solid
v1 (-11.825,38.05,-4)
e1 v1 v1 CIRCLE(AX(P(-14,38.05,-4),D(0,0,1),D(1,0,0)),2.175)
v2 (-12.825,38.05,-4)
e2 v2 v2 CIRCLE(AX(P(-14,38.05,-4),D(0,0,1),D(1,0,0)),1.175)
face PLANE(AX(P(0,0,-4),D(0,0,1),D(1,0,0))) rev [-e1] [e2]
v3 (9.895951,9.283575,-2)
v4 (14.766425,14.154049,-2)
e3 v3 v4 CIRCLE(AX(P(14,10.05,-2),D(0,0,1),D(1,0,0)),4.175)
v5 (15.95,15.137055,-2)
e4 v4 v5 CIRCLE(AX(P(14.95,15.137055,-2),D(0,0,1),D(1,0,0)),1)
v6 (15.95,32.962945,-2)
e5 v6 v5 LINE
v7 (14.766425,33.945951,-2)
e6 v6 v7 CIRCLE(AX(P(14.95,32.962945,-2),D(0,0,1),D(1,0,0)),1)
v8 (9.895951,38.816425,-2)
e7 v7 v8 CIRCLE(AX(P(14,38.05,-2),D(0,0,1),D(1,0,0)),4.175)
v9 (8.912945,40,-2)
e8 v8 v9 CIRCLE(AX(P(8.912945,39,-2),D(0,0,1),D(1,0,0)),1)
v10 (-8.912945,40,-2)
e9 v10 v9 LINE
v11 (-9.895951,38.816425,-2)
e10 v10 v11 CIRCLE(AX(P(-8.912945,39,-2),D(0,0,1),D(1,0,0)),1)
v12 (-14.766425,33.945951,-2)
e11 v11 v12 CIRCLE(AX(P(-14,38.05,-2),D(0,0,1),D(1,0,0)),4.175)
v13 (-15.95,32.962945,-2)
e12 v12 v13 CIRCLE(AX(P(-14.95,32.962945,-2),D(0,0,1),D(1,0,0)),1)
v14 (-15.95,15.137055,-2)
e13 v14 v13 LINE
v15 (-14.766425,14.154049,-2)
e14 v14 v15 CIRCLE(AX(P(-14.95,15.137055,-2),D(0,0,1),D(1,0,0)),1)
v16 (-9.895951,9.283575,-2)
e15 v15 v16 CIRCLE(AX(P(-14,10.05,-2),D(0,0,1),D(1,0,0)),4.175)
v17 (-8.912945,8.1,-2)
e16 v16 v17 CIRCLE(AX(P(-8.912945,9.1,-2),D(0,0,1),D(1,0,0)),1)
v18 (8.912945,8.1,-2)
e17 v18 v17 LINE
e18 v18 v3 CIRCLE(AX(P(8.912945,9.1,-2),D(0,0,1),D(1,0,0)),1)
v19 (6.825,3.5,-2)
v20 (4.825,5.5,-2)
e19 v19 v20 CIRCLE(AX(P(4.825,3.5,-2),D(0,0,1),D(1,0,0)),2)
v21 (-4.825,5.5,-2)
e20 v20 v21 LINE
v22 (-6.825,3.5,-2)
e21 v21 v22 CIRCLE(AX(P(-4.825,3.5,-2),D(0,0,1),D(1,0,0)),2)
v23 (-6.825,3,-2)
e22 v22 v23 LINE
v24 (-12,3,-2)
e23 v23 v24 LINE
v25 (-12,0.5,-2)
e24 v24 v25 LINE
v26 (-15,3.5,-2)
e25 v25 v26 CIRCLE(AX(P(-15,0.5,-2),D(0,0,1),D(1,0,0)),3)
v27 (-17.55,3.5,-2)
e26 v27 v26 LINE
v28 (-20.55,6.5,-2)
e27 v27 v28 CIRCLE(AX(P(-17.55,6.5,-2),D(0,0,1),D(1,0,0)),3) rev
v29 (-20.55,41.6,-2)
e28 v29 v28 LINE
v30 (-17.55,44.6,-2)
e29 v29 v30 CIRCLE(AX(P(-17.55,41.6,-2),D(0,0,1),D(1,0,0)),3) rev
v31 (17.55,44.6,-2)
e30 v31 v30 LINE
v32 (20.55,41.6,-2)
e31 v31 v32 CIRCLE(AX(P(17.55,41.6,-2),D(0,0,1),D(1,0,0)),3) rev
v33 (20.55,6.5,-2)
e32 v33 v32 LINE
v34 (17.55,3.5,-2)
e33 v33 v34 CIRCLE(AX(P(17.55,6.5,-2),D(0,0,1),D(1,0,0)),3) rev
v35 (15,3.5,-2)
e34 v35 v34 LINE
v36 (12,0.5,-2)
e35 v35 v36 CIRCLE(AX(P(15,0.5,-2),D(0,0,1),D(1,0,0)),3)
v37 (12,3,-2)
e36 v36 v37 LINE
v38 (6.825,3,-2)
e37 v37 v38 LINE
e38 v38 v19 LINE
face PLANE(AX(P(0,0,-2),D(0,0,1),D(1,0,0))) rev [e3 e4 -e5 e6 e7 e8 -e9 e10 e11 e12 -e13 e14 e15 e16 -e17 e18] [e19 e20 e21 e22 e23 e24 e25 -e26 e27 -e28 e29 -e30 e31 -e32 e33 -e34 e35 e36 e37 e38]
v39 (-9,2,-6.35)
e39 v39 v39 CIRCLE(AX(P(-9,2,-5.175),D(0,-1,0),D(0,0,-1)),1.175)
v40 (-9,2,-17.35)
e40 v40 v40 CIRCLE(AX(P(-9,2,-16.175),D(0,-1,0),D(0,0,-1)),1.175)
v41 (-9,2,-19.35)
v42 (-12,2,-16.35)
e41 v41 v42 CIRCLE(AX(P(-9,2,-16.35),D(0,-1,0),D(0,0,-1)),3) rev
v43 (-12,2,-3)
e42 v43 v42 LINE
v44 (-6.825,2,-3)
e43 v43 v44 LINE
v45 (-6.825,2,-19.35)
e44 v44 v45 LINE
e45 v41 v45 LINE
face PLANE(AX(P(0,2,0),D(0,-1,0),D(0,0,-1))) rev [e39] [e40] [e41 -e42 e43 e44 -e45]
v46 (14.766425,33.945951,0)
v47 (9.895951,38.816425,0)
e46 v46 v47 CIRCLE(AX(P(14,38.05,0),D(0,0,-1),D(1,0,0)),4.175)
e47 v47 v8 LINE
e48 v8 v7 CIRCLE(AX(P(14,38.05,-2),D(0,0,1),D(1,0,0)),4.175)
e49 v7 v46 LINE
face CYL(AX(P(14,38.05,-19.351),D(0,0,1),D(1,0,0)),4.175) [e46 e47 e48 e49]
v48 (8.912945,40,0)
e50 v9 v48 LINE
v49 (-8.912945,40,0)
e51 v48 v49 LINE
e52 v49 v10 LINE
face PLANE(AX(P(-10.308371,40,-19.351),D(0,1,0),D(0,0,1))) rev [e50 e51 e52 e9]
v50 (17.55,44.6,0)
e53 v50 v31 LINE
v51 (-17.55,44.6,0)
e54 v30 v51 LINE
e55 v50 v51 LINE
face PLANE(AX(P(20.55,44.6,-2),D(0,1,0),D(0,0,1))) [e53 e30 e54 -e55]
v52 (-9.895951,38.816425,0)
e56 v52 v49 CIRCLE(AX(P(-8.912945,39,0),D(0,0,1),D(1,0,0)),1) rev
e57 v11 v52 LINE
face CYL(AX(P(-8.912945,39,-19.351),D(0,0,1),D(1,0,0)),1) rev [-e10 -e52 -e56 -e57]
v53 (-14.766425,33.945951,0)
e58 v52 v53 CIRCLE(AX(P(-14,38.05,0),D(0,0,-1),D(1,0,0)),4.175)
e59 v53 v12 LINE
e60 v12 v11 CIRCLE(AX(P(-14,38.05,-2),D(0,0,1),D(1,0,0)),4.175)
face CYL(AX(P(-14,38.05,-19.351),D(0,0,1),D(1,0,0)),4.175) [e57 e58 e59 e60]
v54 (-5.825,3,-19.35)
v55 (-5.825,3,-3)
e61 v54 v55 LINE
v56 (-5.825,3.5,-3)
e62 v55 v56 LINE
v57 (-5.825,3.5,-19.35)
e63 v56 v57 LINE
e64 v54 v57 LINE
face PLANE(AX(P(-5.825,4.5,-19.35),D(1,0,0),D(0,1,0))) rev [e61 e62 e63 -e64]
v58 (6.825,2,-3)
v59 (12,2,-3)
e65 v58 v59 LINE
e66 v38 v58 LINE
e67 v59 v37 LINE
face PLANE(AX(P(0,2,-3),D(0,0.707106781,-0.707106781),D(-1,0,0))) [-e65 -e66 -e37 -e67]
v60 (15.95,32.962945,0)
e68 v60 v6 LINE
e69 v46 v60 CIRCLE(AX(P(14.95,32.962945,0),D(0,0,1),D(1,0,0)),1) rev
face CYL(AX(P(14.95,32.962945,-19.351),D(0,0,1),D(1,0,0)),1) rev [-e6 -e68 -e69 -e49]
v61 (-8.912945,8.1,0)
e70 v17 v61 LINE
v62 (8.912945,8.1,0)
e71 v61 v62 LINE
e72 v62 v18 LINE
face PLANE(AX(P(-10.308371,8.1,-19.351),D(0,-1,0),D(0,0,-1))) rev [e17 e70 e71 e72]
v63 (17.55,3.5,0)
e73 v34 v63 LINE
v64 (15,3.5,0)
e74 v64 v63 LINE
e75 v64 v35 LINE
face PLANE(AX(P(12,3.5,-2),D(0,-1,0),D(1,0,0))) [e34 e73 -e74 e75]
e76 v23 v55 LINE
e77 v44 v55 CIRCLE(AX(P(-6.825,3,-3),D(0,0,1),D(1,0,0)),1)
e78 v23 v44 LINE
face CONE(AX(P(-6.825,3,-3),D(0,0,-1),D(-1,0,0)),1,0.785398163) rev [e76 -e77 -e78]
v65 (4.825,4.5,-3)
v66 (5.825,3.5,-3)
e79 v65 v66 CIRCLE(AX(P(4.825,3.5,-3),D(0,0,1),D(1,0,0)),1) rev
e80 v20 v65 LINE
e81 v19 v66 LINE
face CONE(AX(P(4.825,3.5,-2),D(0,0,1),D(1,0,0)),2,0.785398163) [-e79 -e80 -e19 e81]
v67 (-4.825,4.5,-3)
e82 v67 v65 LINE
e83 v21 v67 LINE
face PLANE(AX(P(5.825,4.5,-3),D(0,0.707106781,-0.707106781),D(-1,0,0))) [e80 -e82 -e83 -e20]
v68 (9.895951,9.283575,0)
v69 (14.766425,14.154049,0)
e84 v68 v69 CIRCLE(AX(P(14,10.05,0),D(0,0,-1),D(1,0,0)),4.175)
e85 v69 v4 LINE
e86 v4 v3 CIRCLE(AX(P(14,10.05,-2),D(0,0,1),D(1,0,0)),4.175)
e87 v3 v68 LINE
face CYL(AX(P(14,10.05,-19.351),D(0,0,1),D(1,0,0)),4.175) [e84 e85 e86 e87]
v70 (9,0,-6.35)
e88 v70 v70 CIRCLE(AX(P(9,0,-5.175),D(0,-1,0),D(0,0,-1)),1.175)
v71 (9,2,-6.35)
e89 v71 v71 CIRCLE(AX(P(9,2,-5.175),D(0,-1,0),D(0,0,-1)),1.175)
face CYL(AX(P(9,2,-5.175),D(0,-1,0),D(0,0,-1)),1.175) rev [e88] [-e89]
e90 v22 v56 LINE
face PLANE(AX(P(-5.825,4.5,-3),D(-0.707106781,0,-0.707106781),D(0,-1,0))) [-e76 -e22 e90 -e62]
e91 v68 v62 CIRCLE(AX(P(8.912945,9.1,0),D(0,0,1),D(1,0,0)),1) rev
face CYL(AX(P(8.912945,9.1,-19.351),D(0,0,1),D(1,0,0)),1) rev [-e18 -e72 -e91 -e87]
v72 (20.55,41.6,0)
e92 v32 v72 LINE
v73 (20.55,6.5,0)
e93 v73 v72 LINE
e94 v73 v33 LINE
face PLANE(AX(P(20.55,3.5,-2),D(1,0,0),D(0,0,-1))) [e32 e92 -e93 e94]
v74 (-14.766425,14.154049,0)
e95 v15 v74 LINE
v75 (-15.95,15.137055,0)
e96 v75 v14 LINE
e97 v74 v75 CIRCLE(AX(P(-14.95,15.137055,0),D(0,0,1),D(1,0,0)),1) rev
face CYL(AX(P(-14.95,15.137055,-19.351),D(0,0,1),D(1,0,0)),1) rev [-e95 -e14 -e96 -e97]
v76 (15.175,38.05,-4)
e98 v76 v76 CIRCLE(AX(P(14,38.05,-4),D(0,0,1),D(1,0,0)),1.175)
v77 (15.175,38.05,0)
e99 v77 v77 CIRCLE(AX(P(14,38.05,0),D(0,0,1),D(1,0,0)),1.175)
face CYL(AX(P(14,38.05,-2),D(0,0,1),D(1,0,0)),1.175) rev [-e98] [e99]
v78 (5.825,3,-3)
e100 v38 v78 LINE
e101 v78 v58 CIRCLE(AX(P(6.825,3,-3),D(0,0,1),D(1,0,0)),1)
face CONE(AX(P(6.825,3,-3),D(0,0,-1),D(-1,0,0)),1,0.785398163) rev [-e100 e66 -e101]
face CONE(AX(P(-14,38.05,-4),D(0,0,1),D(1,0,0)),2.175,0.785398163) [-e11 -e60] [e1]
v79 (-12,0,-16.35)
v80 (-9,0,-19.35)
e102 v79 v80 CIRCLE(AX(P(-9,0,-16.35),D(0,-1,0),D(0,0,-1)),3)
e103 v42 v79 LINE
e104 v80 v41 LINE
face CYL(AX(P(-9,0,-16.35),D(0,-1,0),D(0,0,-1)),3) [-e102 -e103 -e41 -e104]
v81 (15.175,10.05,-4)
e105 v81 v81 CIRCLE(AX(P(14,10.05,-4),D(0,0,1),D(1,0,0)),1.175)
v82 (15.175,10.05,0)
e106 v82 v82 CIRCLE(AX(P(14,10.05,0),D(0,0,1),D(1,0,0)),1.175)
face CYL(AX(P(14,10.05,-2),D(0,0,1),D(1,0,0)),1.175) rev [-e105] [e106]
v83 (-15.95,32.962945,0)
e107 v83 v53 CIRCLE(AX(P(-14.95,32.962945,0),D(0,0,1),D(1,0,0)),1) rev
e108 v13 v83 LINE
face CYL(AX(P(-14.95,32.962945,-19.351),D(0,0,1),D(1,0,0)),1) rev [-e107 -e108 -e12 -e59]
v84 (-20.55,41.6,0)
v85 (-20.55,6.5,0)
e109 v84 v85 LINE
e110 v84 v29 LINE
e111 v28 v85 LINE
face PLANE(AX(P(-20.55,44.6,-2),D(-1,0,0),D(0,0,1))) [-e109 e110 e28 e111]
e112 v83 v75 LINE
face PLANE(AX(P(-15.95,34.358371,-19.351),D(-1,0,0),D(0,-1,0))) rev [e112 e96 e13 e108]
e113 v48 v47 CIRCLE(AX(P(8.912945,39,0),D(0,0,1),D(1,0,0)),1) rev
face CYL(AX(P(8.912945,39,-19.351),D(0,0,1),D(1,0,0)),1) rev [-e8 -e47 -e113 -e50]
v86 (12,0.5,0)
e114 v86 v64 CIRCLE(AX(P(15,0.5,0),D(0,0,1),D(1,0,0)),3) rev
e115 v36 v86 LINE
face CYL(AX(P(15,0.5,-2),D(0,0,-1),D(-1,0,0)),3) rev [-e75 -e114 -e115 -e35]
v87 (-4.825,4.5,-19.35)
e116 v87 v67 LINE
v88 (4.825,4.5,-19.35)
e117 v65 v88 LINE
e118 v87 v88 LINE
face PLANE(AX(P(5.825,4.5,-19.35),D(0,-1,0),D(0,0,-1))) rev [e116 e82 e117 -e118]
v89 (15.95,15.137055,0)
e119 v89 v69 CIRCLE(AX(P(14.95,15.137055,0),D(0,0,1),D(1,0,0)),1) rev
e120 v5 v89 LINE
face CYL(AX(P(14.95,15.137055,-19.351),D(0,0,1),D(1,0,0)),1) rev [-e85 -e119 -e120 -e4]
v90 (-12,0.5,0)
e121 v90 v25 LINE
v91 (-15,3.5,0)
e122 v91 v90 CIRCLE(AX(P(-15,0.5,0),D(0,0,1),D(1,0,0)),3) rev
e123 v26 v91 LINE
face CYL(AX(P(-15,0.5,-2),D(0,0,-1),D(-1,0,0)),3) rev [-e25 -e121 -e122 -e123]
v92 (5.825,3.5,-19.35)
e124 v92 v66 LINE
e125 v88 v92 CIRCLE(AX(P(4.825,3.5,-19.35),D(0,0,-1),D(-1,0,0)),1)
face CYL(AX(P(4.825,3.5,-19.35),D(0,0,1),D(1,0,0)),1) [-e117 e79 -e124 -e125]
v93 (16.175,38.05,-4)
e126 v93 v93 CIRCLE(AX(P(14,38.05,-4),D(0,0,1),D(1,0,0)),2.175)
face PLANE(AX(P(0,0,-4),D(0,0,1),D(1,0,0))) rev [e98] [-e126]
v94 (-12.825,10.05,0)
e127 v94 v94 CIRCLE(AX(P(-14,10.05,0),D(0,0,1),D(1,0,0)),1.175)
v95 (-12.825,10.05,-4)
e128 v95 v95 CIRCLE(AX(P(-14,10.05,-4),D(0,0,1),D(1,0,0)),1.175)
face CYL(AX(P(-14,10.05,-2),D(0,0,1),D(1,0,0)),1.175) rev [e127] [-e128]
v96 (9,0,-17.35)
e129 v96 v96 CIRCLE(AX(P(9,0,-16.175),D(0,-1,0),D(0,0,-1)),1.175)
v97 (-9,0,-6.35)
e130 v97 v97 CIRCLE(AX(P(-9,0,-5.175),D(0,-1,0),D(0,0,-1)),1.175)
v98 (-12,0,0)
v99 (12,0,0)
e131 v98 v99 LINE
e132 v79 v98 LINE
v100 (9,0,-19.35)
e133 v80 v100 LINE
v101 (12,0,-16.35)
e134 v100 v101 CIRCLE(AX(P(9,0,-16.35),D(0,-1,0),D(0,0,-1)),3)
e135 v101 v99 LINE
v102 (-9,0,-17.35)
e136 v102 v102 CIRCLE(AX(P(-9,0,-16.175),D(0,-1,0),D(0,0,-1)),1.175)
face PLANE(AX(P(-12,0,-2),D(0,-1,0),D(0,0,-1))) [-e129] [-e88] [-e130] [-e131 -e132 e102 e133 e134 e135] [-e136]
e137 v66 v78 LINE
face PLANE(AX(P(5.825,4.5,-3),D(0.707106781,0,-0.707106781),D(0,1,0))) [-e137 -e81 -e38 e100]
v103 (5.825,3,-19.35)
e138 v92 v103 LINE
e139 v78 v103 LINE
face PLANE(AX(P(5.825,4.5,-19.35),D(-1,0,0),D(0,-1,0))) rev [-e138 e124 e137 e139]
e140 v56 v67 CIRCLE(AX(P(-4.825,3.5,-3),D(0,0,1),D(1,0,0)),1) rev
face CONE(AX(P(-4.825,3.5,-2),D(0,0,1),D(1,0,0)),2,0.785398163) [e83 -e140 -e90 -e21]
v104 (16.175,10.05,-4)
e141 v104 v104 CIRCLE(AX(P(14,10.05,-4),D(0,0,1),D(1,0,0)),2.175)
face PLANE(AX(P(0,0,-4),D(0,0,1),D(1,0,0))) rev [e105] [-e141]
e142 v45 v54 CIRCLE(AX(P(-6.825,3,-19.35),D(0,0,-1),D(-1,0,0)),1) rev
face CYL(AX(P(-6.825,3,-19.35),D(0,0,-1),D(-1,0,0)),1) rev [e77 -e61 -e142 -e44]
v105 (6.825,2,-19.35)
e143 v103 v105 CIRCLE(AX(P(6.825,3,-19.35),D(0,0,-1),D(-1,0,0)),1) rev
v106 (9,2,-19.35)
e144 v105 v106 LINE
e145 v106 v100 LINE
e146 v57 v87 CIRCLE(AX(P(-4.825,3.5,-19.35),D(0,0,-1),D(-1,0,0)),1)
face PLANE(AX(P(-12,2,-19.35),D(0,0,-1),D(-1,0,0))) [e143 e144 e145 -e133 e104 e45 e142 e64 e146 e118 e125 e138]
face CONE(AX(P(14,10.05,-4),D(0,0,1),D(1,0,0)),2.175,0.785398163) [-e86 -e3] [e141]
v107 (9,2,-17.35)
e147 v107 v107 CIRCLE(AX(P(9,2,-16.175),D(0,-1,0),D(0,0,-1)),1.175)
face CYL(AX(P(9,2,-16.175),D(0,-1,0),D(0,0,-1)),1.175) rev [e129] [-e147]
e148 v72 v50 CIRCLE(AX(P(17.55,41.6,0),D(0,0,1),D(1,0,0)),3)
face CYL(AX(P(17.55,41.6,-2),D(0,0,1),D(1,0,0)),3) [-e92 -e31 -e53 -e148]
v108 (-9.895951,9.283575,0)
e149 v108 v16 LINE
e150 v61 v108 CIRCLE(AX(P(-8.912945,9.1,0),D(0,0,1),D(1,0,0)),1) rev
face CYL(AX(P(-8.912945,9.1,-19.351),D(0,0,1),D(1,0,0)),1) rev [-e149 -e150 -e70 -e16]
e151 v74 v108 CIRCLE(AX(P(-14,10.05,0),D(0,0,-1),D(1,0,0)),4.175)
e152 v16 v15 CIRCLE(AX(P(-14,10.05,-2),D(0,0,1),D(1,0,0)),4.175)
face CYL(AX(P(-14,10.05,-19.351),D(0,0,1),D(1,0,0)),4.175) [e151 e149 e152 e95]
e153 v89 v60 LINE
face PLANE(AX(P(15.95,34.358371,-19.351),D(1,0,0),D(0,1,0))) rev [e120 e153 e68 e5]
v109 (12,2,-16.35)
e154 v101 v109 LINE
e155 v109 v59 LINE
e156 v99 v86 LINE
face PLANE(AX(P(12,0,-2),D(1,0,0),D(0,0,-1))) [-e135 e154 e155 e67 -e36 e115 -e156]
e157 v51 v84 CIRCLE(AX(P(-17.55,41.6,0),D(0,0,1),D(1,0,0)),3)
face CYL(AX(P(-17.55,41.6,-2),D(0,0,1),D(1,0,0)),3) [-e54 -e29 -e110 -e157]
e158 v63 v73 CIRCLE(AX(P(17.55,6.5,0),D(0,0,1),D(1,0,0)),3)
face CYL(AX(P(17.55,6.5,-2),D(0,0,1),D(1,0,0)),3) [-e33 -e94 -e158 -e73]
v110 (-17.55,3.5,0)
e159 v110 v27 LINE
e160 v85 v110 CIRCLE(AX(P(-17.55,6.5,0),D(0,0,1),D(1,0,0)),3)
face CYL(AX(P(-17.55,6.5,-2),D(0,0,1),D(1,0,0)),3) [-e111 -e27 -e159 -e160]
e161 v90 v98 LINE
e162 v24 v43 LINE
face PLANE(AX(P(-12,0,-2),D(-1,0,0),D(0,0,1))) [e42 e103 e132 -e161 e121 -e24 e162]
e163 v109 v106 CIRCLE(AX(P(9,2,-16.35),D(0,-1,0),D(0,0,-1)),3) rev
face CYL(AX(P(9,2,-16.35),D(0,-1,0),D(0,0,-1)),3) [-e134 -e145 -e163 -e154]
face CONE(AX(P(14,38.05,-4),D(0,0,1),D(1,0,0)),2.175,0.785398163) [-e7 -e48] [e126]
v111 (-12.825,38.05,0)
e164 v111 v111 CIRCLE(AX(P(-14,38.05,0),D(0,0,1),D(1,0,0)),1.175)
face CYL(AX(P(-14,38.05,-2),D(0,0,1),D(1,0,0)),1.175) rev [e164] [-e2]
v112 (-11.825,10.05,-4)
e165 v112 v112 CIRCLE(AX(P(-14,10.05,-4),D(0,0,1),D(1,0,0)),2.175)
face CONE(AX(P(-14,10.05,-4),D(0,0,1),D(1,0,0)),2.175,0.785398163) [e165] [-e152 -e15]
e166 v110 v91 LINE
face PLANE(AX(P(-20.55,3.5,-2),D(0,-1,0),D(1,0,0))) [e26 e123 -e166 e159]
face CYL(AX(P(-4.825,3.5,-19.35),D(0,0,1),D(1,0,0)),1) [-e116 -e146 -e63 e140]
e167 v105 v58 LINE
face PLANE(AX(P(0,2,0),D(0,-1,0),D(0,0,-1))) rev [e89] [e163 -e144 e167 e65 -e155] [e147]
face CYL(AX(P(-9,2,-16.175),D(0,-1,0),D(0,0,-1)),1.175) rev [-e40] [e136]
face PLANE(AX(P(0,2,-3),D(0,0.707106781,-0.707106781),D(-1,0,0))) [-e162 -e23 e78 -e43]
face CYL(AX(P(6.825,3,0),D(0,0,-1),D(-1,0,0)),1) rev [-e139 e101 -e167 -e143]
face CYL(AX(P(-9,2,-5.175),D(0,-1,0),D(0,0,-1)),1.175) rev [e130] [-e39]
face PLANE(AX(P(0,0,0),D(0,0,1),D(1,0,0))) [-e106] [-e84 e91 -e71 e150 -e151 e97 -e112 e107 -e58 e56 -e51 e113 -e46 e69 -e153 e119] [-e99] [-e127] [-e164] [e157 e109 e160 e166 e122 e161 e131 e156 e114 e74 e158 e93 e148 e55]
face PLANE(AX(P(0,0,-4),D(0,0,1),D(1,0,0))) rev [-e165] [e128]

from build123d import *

# Parameters (mm, degrees)
SKETCH3_R           = 1.175
BOSS_EXTRUDE1_DEPTH = 2
FILLET1_R           = 3
SKETCH4_W           = 24
SKETCH4_H           = 19.35
SKETCH4_R           = 1.175
BOSS_EXTRUDE2_DEPTH = 2
FILLET2_R           = 3
SKETCH5_R           = 2.175
SKETCH5_R_2         = 1.175
BOSS_EXTRUDE3_DEPTH = 2
CHAMFER2_SIZE       = 2
CUT_EXTRUDE1_REACH  = 54.781
FILLET3_R           = 1
SKETCH7_W           = 11.65
SKETCH7_H           = 2.5
BOSS_EXTRUDE4_DEPTH = 17.35
FILLET4_R           = 1
CHAMFER3_SIZE       = 1


with BuildPart() as part:
    # Sketch3 → Boss-Extrude1 (new body)
    with BuildSketch(Plane.XY):
        Polygon((-20.55, 3.5), (-12, 3.5), (-12, 0), (12, 0), (12, 3.5), (20.55, 3.5), (20.55, 44.6), (-20.55, 44.6), align=None)
        with Locations((14, 38.05)):
            Circle(SKETCH3_R, mode=Mode.SUBTRACT)
        with Locations((-14, 38.05)):
            Circle(SKETCH3_R, mode=Mode.SUBTRACT)
        with Locations((-14, 10.05)):
            Circle(SKETCH3_R, mode=Mode.SUBTRACT)
        with Locations((14, 10.05)):
            Circle(SKETCH3_R, mode=Mode.SUBTRACT)
    extrude(amount=-BOSS_EXTRUDE1_DEPTH)

    # Fillet1
    fillet1_edges = [part.edges().sort_by_distance(p)[0] for p in [
        (12, 3.5, -1),
        (-12, 3.5, -1),
    ]]
    fillet(fillet1_edges, radius=FILLET1_R)

    # Sketch4 → Boss-Extrude2 (add)
    with BuildSketch(Plane.XZ):
        with Locations((0, -9.675)):
            Rectangle(SKETCH4_W, SKETCH4_H)
        with Locations(Location((9, -16.175, 0), (0, 0, 270))):
            Circle(SKETCH4_R, mode=Mode.SUBTRACT)
        with Locations(Location((-9, -16.175, 0), (0, 0, 270))):
            Circle(SKETCH4_R, mode=Mode.SUBTRACT)
        with Locations(Location((-9, -5.175, 0), (0, 0, 270))):
            Circle(SKETCH4_R, mode=Mode.SUBTRACT)
        with Locations(Location((9, -5.175, 0), (0, 0, 270))):
            Circle(SKETCH4_R, mode=Mode.SUBTRACT)
    extrude(amount=-BOSS_EXTRUDE2_DEPTH)

    # Fillet2
    fillet2_edges = [part.edges().sort_by_distance(p)[0] for p in [
        (-20.55, 44.6, -1),
        (20.55, 44.6, -1),
        (20.55, 3.5, -1),
        (-20.55, 3.5, -1),
        (-12, 1, -19.35),
        (12, 1, -19.35),
    ]]
    fillet(fillet2_edges, radius=FILLET2_R)

    # Sketch5 → Boss-Extrude3 (add)
    # profile 1 of 4: a face of its own
    with BuildSketch(Plane(origin=(0, 0, -2), x_dir=(-1, 0, 0), z_dir=(0, 0, -1))):
        with Locations(Location((14, 10.05, 0), (0, 0, 180))):
            Circle(SKETCH5_R)
        with Locations(Location((14, 10.05, 0), (0, 0, 180))):
            Circle(SKETCH5_R_2, mode=Mode.SUBTRACT)
    # profile 2 of 4: a face of its own
    with BuildSketch(Plane(origin=(0, 0, -2), x_dir=(-1, 0, 0), z_dir=(0, 0, -1))):
        with Locations(Location((-14, 10.05, 0), (0, 0, 180))):
            Circle(SKETCH5_R)
        with Locations(Location((-14, 10.05, 0), (0, 0, 180))):
            Circle(SKETCH5_R_2, mode=Mode.SUBTRACT)
    # profile 3 of 4: a face of its own
    with BuildSketch(Plane(origin=(0, 0, -2), x_dir=(-1, 0, 0), z_dir=(0, 0, -1))):
        with Locations(Location((-14, 38.05, 0), (0, 0, 180))):
            Circle(SKETCH5_R)
        with Locations(Location((-14, 38.05, 0), (0, 0, 180))):
            Circle(SKETCH5_R_2, mode=Mode.SUBTRACT)
    # profile 4 of 4: a face of its own
    with BuildSketch(Plane(origin=(0, 0, -2), x_dir=(-1, 0, 0), z_dir=(0, 0, -1))):
        with Locations(Location((14, 38.05, 0), (0, 0, 180))):
            Circle(SKETCH5_R)
        with Locations(Location((14, 38.05, 0), (0, 0, 180))):
            Circle(SKETCH5_R_2, mode=Mode.SUBTRACT)
    extrude(amount=BOSS_EXTRUDE3_DEPTH)

    # Chamfer2
    chamfer2_edges = [part.edges().sort_by_distance(p)[0] for p in [
        (-16.175, 10.05, -2),
        (11.825, 10.05, -2),
        (11.825, 38.05, -2),
        (-16.175, 38.05, -2),
    ]]
    chamfer(chamfer2_edges, length=CHAMFER2_SIZE - 0.0001)  # a hair under: the kernel refuses the full size

    # Sketch6 → Cut-Extrude1 (cut, up to next)
    with BuildSketch(Plane.XY, mode=Mode.PRIVATE) as cut_extrude1_sk1:
        with BuildLine():
            Line((-10.308370956, 40), (10.308370956, 40))
            ThreePointArc((10.308370956, 40), (11.047829189, 35.097829189), (15.95, 34.358370956))
            Line((15.95, 34.358370956), (15.95, 13.741629044))
            ThreePointArc((15.95, 13.741629044), (11.047829189, 13.002170811), (10.308370956, 8.1))
            Line((10.308370956, 8.1), (-10.308370956, 8.1))
            ThreePointArc((-10.308370956, 8.1), (-11.047829189, 13.002170811), (-15.95, 13.741629044))
            Line((-15.95, 13.741629044), (-15.95, 34.358370956))
            ThreePointArc((-15.95, 34.358370956), (-11.047829189, 35.097829189), (-10.308370956, 40))
        make_face()
    cut_extrude1_tool1 = extrude(cut_extrude1_sk1.sketch, amount=-CUT_EXTRUDE1_REACH, mode=Mode.PRIVATE) & part.part
    add(cut_extrude1_tool1.solids().sort_by_distance((0, 24.05, 0))[0], mode=Mode.SUBTRACT)

    # Fillet3
    fillet3_edges = [part.edges().sort_by_distance(p)[0] for p in [
        (-10.308370956, 8.1, -1),
        (-15.95, 13.741629044, -1),
        (-15.95, 34.358370956, -1),
        (-10.308370956, 40, -1),
        (10.308370956, 40, -1),
        (15.95, 34.358370956, -1),
        (15.95, 13.741629044, -1),
        (10.308370956, 8.1, -1),
    ]]
    fillet(fillet3_edges, radius=FILLET3_R)

    # Sketch7 → Boss-Extrude4 (add, through all)
    with BuildSketch(Plane(origin=(0, 0, -2), x_dir=(-1, 0, 0), z_dir=(0, 0, -1))):
        with Locations((0, 3.25)):
            Rectangle(SKETCH7_W, SKETCH7_H)
    extrude(amount=BOSS_EXTRUDE4_DEPTH)

    # Fillet4
    fillet4_edges = [part.edges().sort_by_distance(p)[0] for p in [
        (5.825, 4.5, -10.675),
        (5.825, 2, -10.675),
        (-5.825, 2, -10.675),
        (-5.825, 4.5, -10.675),
    ]]
    fillet(fillet4_edges, radius=FILLET4_R)

    # Chamfer3
    chamfer3_edges = [part.edges().sort_by_distance(p)[0] for p in [
        (-5.825, 3.25, -2),
        (5.825, 3.25, -2),
        (0, 4.5, -2),
        (9.4125, 2, -2),
        (6.117893219, 2.292893219, -2),
        (-6.117893219, 2.292893219, -2),
        (-5.532106781, 4.207106781, -2),
        (5.532106781, 4.207106781, -2),
        (-9.4125, 2, -2),
    ]]
    chamfer(chamfer3_edges, length=CHAMFER3_SIZE - 0.0001)  # a hair under: the kernel refuses the full size


solid = part.part
